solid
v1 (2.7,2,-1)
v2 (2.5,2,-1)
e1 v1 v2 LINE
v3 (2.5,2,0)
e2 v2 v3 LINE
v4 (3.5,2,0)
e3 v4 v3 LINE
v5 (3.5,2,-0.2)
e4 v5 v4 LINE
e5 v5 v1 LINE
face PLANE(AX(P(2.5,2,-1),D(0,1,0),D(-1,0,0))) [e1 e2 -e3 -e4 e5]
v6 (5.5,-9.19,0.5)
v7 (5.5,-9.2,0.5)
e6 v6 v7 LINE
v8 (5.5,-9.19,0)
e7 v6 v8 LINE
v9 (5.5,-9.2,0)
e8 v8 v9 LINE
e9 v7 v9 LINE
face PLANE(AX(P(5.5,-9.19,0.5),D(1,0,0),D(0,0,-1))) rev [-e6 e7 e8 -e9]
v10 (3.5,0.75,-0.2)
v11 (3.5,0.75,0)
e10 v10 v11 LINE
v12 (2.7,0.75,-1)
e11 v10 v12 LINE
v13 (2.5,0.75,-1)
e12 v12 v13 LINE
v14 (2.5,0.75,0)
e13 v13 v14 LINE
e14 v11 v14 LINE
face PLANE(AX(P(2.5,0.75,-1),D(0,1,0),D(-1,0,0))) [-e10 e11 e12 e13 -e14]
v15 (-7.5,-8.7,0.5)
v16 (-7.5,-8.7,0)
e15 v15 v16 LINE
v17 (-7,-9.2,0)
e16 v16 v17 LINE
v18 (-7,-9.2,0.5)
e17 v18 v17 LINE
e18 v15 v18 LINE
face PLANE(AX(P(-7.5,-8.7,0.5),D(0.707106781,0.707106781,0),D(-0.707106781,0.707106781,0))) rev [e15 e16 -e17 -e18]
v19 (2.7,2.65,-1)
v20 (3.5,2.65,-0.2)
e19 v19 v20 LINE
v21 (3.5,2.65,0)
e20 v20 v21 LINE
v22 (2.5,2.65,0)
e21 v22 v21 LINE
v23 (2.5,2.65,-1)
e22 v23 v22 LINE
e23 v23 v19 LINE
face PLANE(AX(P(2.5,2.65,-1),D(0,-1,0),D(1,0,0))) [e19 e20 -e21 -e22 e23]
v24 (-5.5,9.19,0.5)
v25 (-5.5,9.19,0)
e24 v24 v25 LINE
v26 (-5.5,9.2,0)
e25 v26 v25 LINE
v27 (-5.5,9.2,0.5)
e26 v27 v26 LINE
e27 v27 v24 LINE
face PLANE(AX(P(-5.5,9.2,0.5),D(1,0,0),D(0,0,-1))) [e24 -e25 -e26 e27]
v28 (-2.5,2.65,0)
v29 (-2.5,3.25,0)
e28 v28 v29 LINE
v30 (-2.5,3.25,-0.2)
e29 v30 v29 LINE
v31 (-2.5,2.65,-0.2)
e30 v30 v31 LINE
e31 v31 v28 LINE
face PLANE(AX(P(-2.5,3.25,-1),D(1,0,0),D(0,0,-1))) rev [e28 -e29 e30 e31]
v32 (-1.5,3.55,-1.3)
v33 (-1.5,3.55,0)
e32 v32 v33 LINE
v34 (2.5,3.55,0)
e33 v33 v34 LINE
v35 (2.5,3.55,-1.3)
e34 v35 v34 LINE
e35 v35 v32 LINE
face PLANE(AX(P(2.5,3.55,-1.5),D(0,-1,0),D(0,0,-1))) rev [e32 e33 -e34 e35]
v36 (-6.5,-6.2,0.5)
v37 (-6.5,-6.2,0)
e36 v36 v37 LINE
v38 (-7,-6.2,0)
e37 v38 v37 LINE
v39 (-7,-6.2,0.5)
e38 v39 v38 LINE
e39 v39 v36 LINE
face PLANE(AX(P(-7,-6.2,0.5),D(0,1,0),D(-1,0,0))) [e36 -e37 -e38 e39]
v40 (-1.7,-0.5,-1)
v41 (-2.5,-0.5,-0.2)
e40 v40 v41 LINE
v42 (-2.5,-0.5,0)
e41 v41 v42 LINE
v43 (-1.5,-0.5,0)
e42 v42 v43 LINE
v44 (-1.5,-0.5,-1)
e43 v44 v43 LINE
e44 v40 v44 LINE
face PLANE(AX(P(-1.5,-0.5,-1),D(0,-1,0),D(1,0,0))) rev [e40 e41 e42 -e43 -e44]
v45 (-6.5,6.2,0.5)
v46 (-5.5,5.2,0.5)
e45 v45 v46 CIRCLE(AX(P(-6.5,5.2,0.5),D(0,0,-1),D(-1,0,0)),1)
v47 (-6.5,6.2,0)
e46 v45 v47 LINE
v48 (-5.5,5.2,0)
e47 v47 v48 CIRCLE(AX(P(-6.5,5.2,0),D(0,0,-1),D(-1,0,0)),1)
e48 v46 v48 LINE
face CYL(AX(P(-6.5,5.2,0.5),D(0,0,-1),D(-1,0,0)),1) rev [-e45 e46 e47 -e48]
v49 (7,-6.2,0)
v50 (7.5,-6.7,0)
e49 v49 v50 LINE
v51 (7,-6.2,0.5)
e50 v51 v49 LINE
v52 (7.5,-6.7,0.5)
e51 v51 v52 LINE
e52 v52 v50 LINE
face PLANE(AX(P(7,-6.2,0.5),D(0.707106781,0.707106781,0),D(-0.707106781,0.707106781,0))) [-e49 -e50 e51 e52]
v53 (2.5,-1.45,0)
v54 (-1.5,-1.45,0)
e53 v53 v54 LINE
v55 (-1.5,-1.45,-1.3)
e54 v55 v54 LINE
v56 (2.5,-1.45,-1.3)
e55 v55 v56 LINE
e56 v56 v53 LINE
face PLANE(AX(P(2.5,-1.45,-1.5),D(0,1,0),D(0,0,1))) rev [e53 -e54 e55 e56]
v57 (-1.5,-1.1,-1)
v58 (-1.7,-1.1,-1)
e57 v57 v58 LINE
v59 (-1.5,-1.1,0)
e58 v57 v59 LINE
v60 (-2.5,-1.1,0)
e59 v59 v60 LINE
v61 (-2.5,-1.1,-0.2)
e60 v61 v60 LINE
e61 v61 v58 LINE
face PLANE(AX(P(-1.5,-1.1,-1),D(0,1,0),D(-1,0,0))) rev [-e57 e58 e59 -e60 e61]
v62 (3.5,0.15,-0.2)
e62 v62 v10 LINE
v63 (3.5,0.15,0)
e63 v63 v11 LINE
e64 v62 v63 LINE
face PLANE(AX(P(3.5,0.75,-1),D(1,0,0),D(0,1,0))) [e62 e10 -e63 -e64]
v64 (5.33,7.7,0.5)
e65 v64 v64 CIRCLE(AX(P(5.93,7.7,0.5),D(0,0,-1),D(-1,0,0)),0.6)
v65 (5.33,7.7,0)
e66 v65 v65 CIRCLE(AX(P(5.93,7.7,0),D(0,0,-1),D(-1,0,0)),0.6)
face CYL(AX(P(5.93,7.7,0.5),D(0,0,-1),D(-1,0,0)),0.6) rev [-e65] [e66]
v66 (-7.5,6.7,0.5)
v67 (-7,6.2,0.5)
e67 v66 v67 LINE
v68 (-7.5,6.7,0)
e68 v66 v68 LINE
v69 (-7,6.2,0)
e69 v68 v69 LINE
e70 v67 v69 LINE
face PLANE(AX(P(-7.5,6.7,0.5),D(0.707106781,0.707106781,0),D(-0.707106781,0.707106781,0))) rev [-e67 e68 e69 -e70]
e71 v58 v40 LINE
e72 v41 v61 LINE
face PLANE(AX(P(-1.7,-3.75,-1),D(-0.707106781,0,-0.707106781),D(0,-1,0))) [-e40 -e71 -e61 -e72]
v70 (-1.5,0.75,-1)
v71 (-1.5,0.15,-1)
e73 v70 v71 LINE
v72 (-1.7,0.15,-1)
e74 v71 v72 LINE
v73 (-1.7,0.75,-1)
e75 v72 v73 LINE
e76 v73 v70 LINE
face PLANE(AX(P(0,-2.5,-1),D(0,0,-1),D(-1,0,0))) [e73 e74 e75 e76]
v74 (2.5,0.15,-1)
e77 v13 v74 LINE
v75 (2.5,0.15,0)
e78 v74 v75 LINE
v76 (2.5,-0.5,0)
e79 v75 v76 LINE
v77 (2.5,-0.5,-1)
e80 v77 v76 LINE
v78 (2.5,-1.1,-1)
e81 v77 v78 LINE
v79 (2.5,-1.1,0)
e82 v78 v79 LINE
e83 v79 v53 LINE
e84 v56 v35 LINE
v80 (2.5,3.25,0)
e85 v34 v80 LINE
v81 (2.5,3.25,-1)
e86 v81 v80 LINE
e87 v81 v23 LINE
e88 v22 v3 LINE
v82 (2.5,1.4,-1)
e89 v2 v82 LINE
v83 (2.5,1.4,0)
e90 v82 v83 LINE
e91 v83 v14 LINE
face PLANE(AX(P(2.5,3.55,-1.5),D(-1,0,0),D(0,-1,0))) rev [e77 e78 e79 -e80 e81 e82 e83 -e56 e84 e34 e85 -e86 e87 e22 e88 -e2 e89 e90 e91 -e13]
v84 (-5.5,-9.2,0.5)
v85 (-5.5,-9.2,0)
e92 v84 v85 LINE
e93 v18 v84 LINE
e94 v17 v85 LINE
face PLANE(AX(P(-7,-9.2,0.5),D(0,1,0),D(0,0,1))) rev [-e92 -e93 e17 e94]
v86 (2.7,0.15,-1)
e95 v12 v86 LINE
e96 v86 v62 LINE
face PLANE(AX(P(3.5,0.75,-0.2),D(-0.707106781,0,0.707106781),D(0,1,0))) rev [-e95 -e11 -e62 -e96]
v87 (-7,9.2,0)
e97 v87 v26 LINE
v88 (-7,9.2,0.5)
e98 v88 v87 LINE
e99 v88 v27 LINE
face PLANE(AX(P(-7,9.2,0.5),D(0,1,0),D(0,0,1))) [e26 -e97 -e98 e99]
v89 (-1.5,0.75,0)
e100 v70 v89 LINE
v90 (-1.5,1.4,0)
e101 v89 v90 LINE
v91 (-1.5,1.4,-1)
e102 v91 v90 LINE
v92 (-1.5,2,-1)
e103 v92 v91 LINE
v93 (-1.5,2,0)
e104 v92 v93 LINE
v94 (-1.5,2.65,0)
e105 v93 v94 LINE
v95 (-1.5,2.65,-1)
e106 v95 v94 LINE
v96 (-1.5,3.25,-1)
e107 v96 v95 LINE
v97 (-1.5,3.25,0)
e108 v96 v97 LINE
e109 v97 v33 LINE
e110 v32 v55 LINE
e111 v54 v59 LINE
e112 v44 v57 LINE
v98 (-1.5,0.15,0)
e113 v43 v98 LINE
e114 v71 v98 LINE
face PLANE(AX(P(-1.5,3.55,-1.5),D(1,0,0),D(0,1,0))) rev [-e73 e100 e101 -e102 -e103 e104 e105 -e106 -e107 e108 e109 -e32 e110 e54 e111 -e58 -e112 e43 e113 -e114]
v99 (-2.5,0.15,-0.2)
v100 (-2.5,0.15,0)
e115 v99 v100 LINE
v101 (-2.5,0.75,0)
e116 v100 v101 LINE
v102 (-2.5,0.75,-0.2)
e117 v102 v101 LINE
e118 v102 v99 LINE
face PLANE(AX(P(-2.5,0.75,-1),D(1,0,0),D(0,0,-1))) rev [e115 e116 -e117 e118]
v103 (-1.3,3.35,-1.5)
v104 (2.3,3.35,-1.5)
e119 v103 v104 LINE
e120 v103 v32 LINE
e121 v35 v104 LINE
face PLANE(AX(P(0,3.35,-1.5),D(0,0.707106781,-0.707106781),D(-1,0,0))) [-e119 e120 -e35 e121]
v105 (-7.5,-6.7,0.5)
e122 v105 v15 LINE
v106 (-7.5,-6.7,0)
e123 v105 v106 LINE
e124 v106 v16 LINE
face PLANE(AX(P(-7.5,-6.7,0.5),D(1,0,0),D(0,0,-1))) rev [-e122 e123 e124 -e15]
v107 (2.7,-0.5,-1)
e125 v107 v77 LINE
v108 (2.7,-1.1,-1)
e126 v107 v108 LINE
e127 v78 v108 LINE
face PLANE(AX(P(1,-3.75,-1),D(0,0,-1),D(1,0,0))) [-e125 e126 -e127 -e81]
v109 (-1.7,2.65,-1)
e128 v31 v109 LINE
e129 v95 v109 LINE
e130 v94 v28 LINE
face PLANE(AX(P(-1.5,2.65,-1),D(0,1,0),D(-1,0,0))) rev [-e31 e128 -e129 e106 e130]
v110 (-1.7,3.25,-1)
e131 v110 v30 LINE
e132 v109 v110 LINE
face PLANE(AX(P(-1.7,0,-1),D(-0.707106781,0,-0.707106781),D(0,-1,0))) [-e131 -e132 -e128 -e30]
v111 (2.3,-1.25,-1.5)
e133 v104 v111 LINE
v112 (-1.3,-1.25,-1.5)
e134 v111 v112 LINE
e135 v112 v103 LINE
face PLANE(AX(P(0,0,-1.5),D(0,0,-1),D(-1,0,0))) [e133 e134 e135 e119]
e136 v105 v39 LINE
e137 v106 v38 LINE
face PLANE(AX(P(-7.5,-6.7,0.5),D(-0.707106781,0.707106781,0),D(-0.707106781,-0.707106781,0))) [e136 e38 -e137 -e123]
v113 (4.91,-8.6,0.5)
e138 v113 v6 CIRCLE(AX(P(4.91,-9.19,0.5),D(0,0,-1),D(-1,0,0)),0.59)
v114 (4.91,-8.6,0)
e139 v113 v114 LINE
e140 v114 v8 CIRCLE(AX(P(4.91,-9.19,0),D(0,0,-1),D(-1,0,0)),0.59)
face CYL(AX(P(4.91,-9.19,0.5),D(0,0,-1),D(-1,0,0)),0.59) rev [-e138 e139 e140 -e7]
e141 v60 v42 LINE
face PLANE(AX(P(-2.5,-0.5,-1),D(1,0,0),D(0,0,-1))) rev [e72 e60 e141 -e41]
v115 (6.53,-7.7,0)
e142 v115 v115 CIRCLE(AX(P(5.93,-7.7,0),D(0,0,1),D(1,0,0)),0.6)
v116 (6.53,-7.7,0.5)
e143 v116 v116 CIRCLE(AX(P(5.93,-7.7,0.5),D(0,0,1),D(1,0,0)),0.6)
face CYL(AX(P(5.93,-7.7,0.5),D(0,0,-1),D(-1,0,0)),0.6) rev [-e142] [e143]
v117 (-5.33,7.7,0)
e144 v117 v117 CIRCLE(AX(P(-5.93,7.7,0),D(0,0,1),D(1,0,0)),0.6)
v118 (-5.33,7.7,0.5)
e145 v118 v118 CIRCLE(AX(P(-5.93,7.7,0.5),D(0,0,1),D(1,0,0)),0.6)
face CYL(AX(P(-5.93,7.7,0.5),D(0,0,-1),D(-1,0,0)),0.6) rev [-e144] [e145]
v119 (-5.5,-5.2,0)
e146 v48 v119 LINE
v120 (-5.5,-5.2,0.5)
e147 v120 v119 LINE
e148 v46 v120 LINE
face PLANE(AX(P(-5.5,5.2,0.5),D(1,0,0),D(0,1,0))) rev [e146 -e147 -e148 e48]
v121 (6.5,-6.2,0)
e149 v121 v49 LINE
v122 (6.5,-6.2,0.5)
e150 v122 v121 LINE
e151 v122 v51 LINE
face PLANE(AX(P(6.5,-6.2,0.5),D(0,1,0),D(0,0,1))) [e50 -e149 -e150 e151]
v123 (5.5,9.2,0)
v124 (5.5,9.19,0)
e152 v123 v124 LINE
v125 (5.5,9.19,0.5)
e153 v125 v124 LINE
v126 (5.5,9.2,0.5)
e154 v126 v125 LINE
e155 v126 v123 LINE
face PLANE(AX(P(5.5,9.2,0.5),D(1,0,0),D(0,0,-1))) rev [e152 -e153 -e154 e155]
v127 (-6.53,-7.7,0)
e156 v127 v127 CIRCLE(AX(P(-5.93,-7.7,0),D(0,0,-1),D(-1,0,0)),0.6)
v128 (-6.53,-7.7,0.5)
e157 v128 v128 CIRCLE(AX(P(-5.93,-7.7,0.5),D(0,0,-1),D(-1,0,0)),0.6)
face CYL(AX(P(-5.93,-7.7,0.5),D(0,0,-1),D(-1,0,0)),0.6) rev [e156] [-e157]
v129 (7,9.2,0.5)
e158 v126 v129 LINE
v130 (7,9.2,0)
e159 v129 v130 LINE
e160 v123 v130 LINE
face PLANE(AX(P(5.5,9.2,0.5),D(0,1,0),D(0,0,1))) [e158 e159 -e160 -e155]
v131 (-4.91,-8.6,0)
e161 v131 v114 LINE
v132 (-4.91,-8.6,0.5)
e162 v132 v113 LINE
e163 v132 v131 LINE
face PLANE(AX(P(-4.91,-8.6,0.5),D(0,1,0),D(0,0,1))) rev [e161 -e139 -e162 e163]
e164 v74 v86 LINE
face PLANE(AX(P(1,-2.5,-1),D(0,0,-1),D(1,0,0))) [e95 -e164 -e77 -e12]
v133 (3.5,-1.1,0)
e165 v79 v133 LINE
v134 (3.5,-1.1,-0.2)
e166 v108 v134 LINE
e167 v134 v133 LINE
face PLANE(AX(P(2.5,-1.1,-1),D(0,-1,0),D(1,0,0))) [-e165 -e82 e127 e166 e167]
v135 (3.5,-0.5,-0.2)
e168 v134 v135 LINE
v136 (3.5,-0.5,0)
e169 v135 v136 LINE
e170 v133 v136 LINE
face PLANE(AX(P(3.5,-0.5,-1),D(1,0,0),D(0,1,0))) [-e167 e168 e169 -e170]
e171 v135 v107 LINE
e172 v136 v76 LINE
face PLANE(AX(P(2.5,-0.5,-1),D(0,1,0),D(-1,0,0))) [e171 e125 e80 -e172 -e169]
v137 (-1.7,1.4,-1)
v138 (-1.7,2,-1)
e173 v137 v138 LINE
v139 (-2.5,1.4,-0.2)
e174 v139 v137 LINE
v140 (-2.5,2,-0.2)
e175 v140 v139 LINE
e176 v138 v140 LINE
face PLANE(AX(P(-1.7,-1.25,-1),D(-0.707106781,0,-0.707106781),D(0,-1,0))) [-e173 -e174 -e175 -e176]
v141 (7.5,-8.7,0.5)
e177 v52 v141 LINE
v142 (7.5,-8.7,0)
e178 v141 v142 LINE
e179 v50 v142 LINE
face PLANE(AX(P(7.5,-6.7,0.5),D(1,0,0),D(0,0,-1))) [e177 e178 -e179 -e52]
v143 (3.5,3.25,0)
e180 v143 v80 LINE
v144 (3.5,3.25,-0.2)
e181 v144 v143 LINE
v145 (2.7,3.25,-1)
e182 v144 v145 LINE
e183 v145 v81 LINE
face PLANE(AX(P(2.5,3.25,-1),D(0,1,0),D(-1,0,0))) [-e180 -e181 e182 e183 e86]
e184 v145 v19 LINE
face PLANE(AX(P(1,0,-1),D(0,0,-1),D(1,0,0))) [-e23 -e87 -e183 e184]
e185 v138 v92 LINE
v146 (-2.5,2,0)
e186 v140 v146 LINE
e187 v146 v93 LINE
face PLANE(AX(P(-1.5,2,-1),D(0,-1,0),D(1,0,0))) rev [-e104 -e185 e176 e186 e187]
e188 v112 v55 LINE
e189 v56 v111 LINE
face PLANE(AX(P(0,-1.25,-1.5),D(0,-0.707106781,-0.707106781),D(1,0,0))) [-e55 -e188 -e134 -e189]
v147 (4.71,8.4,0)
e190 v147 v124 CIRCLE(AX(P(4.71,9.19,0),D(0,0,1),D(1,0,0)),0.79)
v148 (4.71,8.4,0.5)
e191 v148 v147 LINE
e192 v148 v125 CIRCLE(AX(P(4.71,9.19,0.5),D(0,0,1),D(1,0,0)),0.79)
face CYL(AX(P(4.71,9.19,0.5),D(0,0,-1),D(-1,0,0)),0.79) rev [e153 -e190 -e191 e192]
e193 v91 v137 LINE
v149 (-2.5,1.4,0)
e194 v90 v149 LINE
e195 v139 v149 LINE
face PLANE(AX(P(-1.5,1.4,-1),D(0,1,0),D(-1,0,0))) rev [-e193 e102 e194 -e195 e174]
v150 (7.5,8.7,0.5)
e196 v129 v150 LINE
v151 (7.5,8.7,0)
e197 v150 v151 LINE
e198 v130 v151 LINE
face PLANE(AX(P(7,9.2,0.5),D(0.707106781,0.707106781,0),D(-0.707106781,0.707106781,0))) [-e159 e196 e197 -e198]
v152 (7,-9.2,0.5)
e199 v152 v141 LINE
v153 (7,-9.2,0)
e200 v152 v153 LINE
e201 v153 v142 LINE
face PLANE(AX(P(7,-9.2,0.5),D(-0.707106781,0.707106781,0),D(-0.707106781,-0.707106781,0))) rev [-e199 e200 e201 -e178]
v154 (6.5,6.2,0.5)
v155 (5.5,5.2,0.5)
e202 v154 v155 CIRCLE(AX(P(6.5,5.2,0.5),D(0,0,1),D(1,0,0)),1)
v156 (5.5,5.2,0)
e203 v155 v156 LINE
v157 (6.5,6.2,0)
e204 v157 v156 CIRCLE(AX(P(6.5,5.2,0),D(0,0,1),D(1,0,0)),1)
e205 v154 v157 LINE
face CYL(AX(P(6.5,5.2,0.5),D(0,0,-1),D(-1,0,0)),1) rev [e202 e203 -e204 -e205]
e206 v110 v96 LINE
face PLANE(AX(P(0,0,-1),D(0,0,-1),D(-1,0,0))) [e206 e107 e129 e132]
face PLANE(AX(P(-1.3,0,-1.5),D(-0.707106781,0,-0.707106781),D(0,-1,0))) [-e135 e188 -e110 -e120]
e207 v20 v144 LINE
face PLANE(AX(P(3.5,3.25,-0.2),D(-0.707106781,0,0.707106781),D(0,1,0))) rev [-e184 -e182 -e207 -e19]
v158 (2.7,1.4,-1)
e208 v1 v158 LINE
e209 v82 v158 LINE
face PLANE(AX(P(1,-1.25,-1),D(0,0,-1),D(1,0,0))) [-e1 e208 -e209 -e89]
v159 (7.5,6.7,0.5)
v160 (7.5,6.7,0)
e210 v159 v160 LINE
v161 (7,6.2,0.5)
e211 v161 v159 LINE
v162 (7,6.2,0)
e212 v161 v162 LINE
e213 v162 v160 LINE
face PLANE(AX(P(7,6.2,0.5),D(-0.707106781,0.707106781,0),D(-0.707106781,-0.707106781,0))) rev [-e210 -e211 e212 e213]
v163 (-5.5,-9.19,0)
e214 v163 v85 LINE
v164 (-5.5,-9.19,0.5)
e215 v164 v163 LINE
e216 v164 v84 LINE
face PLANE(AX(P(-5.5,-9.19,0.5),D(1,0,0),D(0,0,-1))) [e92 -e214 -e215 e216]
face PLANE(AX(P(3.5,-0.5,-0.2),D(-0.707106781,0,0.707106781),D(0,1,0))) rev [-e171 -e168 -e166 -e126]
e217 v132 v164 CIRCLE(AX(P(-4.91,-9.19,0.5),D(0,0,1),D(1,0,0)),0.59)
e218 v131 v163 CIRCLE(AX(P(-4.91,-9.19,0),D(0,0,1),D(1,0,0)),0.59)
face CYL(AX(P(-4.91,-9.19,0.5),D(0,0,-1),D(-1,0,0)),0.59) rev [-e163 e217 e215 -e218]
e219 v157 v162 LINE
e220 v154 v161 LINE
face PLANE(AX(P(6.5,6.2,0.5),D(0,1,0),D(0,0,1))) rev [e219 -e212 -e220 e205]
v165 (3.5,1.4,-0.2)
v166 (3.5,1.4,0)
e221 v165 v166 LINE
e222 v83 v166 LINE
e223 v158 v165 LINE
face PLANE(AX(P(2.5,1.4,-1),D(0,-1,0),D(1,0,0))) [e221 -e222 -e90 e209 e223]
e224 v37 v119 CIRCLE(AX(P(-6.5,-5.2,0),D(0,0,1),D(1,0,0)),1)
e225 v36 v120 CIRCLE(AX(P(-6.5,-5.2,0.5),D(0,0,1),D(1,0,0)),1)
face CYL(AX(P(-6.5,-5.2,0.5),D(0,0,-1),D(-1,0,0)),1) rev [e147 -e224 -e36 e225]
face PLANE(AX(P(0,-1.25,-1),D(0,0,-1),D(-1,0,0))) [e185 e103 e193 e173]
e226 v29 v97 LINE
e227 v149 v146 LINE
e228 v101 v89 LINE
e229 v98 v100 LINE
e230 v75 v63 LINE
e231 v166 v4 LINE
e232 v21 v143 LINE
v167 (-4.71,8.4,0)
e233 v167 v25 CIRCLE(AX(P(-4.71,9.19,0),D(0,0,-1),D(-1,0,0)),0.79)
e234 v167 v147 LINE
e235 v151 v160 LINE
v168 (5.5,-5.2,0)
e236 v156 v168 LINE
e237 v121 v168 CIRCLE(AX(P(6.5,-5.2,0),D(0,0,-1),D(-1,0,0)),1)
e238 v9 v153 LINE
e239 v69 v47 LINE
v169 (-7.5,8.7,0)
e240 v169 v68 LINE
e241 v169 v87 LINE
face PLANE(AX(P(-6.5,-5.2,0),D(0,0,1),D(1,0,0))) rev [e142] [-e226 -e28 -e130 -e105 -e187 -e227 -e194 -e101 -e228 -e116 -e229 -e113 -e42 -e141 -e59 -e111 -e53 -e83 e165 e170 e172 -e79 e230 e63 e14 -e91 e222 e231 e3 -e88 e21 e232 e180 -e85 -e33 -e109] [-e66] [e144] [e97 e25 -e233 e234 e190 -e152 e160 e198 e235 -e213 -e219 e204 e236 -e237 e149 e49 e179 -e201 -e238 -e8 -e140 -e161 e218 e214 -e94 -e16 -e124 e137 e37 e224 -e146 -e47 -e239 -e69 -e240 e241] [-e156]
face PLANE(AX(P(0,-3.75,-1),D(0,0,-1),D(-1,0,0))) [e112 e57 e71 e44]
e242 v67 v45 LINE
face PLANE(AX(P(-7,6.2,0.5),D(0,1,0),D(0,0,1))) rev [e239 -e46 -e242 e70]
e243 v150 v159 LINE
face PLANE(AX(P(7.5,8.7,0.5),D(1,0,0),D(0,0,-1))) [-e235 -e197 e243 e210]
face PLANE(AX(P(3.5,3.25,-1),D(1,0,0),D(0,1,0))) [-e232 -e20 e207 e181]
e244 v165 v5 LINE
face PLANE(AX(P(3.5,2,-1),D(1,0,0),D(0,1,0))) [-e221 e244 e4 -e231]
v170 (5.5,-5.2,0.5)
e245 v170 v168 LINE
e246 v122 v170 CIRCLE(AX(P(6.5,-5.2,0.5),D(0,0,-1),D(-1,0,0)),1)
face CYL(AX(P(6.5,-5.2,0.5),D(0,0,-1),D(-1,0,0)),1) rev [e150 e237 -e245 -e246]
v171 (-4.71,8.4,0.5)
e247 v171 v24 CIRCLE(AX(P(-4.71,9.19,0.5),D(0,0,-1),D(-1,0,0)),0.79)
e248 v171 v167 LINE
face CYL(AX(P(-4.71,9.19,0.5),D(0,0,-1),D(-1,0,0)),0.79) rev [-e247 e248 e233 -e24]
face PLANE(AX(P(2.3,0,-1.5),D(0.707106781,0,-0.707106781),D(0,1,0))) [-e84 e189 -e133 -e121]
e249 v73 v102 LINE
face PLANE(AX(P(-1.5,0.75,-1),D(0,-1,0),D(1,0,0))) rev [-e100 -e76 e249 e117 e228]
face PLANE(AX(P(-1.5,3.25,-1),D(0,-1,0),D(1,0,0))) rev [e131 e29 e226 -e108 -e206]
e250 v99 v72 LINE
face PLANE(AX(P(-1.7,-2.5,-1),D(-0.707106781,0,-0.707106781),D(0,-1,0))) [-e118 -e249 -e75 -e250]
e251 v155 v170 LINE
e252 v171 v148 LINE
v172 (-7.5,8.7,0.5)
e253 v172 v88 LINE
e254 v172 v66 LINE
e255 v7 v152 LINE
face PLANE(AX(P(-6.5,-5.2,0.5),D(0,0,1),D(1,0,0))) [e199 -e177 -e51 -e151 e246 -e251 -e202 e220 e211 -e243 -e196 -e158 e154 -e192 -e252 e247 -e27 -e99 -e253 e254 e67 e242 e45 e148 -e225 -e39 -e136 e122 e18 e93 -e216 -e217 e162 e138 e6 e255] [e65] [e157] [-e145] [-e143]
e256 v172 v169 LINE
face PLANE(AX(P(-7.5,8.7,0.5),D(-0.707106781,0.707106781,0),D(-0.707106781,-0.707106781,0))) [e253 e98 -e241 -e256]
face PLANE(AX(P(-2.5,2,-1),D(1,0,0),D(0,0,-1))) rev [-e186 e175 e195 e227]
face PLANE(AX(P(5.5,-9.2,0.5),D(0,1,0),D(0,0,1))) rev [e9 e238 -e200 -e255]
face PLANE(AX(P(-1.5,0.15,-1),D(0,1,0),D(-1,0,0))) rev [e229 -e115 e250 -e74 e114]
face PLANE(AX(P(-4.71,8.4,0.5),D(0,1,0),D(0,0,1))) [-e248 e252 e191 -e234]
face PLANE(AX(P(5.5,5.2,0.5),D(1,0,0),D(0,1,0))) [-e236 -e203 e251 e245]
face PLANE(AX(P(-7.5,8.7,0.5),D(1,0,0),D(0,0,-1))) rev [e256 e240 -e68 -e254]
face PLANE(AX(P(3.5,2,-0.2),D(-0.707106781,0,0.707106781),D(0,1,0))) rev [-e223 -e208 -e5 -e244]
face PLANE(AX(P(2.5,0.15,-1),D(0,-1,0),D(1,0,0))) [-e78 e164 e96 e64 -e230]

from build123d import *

# Parameters (mm, degrees)
ESBO_O1_R                       = 0.6
RESSALTO_EXTRUS_O1_DEPTH        = 0.5
ESBO_O3_W                       = 4
ESBO_O3_H                       = 5
RESSALTO_EXTRUS_O2_DEPTH        = 1.5
ESBO_O4_W                       = 1
ESBO_O4_H                       = 0.6
RESSALTO_EXTRUS_O3_DEPTH        = 1
CHANFRO1_SIZE                   = 0.8
PADR_O_LINEAR1_COUNT            = 4
PADR_O_LINEAR1_PITCH            = 1.25
CHANFRO1_OF_PADR_O_LINEAR1_SIZE = 0.8
ESPELHAR1_START                 = -1.1
ESPELHAR1_DEPTH                 = 0.6
ESPELHAR1_START_2               = 0.15
ESPELHAR1_2_DEPTH               = 0.6
ESPELHAR1_START_3               = 1.4
ESPELHAR1_3_DEPTH               = 0.6
ESPELHAR1_START_4               = 2.65
ESPELHAR1_4_DEPTH               = 0.6
CHANFRO2_SIZE                   = 0.2


# Read off the part's stored shape, not the designer's step: Espelhar1
with BuildPart() as part:
    # Esboço1 → Ressalto-extrusão1 (new body)
    with BuildSketch(Plane.XY):
        with BuildLine():
            Line((-7, 9.2), (-5.5, 9.2))
            Line((-5.5, 9.2), (-5.5, 9.19))
            ThreePointArc((-5.5, 9.19), (-5.268614357, 8.631385643), (-4.71, 8.4))
            Line((-4.71, 8.4), (4.71, 8.4))
            ThreePointArc((4.71, 8.4), (5.268614357, 8.631385643), (5.5, 9.19))
            Line((5.5, 9.19), (5.5, 9.2))
            Line((5.5, 9.2), (7, 9.2))
            Line((7, 9.2), (7.5, 8.7))
            Line((7.5, 8.7), (7.5, 6.7))
            Line((7.5, 6.7), (7, 6.2))
            Line((7, 6.2), (6.5, 6.2))
            ThreePointArc((6.5, 6.2), (5.792893219, 5.907106781), (5.5, 5.2))
            Line((5.5, 5.2), (5.5, -5.2))
            ThreePointArc((5.5, -5.2), (5.792893219, -5.907106781), (6.5, -6.2))
            Line((6.5, -6.2), (7, -6.2))
            Line((7, -6.2), (7.5, -6.7))
            Line((7.5, -6.7), (7.5, -8.7))
            Line((7.5, -8.7), (7, -9.2))
            Line((7, -9.2), (5.5, -9.2))
            Line((5.5, -9.2), (5.5, -9.19))
            ThreePointArc((5.5, -9.19), (5.327193001, -8.772806999), (4.91, -8.6))
            Line((4.91, -8.6), (-4.91, -8.6))
            ThreePointArc((-4.91, -8.6), (-5.327193001, -8.772806999), (-5.5, -9.19))
            Line((-5.5, -9.19), (-5.5, -9.2))
            Line((-5.5, -9.2), (-7, -9.2))
            Line((-7, -9.2), (-7.5, -8.7))
            Line((-7.5, -8.7), (-7.5, -6.7))
            Line((-7.5, -6.7), (-7, -6.2))
            Line((-7, -6.2), (-6.5, -6.2))
            ThreePointArc((-6.5, -6.2), (-5.792893219, -5.907106781), (-5.5, -5.2))
            Line((-5.5, -5.2), (-5.5, 5.2))
            ThreePointArc((-5.5, 5.2), (-5.792893219, 5.907106781), (-6.5, 6.2))
            Line((-6.5, 6.2), (-7, 6.2))
            Line((-7, 6.2), (-7.5, 6.7))
            Line((-7.5, 6.7), (-7.5, 8.7))
            Line((-7.5, 8.7), (-7, 9.2))
        make_face()
        with Locations((-5.93, 7.7)):
            Circle(ESBO_O1_R, mode=Mode.SUBTRACT)
        with Locations(Location((5.93, 7.7, 0), (0, 0, 180))):
            Circle(ESBO_O1_R, mode=Mode.SUBTRACT)
        with Locations(Location((-5.93, -7.7, 0), (0, 0, 180))):
            Circle(ESBO_O1_R, mode=Mode.SUBTRACT)
        with Locations((5.93, -7.7)):
            Circle(ESBO_O1_R, mode=Mode.SUBTRACT)
    extrude(amount=RESSALTO_EXTRUS_O1_DEPTH)

    # Esboço3 → Ressalto-extrusão2 (add)
    with BuildSketch(Plane(origin=(0, 0, 0), x_dir=(-1, 0, 0), z_dir=(0, 0, -1))):
        with Locations((-0.5, 1.05)):
            Rectangle(ESBO_O3_W, ESBO_O3_H)
    extrude(amount=RESSALTO_EXTRUS_O2_DEPTH)

    # Esboço4 → Ressalto-extrusão3 (add)
    with BuildSketch(Plane(origin=(0, 0, 0), x_dir=(-1, 0, 0), z_dir=(0, 0, -1))):
        with Locations((2, 2.95)):
            Rectangle(ESBO_O4_W, ESBO_O4_H)
    ressalto_extrus_o3 = extrude(amount=RESSALTO_EXTRUS_O3_DEPTH)

    # Chanfro1
    chanfro1_edges = [part.edges().sort_by_distance(p)[0] for p in [
        (-2.5, 2.95, -1),
    ]]
    chamfer(chanfro1_edges, length=CHANFRO1_SIZE)

    # Padrão linear1: Ressalto-extrusão3 ×4
    with Locations(*[(0, -i * PADR_O_LINEAR1_PITCH, 0) for i in range(1, PADR_O_LINEAR1_COUNT)]):
        add(ressalto_extrus_o3)

    # Chanfro1 of Padrão linear1
    chanfro1_of_padr_o_linear1_edges = [part.edges().sort_by_distance(p)[0] for p in [
        (-2.5, 1.7, -1),
        (-2.5, 0.45, -1),
        (-2.5, -0.8, -1),
    ]]
    chamfer(chanfro1_of_padr_o_linear1_edges, length=CHANFRO1_OF_PADR_O_LINEAR1_SIZE)

    # Espelhar1 outline → Espelhar1 (add)
    with BuildSketch(Plane(origin=(0, 0, 0), x_dir=(1, 0, 0), z_dir=(0, 1, 0)).offset(ESPELHAR1_START)):
        Polygon((3.5, 0.2), (2.7, 1), (2.5, 1), (2.5, 0), (3.5, 0), align=None)
    extrude(amount=ESPELHAR1_DEPTH)

    # Espelhar1 2 outline → Espelhar1 2 (add)
    with BuildSketch(Plane(origin=(0, 0, 0), x_dir=(1, 0, 0), z_dir=(0, 1, 0)).offset(ESPELHAR1_START_2)):
        Polygon((3.5, 0.2), (2.7, 1), (2.5, 1), (2.5, 0), (3.5, 0), align=None)
    extrude(amount=ESPELHAR1_2_DEPTH)

    # Espelhar1 3 outline → Espelhar1 3 (add)
    with BuildSketch(Plane(origin=(0, 0, 0), x_dir=(1, 0, 0), z_dir=(0, 1, 0)).offset(ESPELHAR1_START_3)):
        Polygon((3.5, 0.2), (2.7, 1), (2.5, 1), (2.5, 0), (3.5, 0), align=None)
    extrude(amount=ESPELHAR1_3_DEPTH)

    # Espelhar1 4 outline → Espelhar1 4 (add)
    with BuildSketch(Plane(origin=(0, 0, 0), x_dir=(1, 0, 0), z_dir=(0, 1, 0)).offset(ESPELHAR1_START_4)):
        Polygon((3.5, 0.2), (2.7, 1), (2.5, 1), (2.5, 0), (3.5, 0), align=None)
    extrude(amount=ESPELHAR1_4_DEPTH)

    # Chanfro2
    chanfro2_edges = [part.edges().sort_by_distance(p)[0] for p in [
        (2.5, 1.05, -1.5),
        (0.5, -1.45, -1.5),
        (-1.5, 1.05, -1.5),
        (0.5, 3.55, -1.5),
    ]]
    chamfer(chanfro2_edges, length=CHANFRO2_SIZE)


solid = part.part
